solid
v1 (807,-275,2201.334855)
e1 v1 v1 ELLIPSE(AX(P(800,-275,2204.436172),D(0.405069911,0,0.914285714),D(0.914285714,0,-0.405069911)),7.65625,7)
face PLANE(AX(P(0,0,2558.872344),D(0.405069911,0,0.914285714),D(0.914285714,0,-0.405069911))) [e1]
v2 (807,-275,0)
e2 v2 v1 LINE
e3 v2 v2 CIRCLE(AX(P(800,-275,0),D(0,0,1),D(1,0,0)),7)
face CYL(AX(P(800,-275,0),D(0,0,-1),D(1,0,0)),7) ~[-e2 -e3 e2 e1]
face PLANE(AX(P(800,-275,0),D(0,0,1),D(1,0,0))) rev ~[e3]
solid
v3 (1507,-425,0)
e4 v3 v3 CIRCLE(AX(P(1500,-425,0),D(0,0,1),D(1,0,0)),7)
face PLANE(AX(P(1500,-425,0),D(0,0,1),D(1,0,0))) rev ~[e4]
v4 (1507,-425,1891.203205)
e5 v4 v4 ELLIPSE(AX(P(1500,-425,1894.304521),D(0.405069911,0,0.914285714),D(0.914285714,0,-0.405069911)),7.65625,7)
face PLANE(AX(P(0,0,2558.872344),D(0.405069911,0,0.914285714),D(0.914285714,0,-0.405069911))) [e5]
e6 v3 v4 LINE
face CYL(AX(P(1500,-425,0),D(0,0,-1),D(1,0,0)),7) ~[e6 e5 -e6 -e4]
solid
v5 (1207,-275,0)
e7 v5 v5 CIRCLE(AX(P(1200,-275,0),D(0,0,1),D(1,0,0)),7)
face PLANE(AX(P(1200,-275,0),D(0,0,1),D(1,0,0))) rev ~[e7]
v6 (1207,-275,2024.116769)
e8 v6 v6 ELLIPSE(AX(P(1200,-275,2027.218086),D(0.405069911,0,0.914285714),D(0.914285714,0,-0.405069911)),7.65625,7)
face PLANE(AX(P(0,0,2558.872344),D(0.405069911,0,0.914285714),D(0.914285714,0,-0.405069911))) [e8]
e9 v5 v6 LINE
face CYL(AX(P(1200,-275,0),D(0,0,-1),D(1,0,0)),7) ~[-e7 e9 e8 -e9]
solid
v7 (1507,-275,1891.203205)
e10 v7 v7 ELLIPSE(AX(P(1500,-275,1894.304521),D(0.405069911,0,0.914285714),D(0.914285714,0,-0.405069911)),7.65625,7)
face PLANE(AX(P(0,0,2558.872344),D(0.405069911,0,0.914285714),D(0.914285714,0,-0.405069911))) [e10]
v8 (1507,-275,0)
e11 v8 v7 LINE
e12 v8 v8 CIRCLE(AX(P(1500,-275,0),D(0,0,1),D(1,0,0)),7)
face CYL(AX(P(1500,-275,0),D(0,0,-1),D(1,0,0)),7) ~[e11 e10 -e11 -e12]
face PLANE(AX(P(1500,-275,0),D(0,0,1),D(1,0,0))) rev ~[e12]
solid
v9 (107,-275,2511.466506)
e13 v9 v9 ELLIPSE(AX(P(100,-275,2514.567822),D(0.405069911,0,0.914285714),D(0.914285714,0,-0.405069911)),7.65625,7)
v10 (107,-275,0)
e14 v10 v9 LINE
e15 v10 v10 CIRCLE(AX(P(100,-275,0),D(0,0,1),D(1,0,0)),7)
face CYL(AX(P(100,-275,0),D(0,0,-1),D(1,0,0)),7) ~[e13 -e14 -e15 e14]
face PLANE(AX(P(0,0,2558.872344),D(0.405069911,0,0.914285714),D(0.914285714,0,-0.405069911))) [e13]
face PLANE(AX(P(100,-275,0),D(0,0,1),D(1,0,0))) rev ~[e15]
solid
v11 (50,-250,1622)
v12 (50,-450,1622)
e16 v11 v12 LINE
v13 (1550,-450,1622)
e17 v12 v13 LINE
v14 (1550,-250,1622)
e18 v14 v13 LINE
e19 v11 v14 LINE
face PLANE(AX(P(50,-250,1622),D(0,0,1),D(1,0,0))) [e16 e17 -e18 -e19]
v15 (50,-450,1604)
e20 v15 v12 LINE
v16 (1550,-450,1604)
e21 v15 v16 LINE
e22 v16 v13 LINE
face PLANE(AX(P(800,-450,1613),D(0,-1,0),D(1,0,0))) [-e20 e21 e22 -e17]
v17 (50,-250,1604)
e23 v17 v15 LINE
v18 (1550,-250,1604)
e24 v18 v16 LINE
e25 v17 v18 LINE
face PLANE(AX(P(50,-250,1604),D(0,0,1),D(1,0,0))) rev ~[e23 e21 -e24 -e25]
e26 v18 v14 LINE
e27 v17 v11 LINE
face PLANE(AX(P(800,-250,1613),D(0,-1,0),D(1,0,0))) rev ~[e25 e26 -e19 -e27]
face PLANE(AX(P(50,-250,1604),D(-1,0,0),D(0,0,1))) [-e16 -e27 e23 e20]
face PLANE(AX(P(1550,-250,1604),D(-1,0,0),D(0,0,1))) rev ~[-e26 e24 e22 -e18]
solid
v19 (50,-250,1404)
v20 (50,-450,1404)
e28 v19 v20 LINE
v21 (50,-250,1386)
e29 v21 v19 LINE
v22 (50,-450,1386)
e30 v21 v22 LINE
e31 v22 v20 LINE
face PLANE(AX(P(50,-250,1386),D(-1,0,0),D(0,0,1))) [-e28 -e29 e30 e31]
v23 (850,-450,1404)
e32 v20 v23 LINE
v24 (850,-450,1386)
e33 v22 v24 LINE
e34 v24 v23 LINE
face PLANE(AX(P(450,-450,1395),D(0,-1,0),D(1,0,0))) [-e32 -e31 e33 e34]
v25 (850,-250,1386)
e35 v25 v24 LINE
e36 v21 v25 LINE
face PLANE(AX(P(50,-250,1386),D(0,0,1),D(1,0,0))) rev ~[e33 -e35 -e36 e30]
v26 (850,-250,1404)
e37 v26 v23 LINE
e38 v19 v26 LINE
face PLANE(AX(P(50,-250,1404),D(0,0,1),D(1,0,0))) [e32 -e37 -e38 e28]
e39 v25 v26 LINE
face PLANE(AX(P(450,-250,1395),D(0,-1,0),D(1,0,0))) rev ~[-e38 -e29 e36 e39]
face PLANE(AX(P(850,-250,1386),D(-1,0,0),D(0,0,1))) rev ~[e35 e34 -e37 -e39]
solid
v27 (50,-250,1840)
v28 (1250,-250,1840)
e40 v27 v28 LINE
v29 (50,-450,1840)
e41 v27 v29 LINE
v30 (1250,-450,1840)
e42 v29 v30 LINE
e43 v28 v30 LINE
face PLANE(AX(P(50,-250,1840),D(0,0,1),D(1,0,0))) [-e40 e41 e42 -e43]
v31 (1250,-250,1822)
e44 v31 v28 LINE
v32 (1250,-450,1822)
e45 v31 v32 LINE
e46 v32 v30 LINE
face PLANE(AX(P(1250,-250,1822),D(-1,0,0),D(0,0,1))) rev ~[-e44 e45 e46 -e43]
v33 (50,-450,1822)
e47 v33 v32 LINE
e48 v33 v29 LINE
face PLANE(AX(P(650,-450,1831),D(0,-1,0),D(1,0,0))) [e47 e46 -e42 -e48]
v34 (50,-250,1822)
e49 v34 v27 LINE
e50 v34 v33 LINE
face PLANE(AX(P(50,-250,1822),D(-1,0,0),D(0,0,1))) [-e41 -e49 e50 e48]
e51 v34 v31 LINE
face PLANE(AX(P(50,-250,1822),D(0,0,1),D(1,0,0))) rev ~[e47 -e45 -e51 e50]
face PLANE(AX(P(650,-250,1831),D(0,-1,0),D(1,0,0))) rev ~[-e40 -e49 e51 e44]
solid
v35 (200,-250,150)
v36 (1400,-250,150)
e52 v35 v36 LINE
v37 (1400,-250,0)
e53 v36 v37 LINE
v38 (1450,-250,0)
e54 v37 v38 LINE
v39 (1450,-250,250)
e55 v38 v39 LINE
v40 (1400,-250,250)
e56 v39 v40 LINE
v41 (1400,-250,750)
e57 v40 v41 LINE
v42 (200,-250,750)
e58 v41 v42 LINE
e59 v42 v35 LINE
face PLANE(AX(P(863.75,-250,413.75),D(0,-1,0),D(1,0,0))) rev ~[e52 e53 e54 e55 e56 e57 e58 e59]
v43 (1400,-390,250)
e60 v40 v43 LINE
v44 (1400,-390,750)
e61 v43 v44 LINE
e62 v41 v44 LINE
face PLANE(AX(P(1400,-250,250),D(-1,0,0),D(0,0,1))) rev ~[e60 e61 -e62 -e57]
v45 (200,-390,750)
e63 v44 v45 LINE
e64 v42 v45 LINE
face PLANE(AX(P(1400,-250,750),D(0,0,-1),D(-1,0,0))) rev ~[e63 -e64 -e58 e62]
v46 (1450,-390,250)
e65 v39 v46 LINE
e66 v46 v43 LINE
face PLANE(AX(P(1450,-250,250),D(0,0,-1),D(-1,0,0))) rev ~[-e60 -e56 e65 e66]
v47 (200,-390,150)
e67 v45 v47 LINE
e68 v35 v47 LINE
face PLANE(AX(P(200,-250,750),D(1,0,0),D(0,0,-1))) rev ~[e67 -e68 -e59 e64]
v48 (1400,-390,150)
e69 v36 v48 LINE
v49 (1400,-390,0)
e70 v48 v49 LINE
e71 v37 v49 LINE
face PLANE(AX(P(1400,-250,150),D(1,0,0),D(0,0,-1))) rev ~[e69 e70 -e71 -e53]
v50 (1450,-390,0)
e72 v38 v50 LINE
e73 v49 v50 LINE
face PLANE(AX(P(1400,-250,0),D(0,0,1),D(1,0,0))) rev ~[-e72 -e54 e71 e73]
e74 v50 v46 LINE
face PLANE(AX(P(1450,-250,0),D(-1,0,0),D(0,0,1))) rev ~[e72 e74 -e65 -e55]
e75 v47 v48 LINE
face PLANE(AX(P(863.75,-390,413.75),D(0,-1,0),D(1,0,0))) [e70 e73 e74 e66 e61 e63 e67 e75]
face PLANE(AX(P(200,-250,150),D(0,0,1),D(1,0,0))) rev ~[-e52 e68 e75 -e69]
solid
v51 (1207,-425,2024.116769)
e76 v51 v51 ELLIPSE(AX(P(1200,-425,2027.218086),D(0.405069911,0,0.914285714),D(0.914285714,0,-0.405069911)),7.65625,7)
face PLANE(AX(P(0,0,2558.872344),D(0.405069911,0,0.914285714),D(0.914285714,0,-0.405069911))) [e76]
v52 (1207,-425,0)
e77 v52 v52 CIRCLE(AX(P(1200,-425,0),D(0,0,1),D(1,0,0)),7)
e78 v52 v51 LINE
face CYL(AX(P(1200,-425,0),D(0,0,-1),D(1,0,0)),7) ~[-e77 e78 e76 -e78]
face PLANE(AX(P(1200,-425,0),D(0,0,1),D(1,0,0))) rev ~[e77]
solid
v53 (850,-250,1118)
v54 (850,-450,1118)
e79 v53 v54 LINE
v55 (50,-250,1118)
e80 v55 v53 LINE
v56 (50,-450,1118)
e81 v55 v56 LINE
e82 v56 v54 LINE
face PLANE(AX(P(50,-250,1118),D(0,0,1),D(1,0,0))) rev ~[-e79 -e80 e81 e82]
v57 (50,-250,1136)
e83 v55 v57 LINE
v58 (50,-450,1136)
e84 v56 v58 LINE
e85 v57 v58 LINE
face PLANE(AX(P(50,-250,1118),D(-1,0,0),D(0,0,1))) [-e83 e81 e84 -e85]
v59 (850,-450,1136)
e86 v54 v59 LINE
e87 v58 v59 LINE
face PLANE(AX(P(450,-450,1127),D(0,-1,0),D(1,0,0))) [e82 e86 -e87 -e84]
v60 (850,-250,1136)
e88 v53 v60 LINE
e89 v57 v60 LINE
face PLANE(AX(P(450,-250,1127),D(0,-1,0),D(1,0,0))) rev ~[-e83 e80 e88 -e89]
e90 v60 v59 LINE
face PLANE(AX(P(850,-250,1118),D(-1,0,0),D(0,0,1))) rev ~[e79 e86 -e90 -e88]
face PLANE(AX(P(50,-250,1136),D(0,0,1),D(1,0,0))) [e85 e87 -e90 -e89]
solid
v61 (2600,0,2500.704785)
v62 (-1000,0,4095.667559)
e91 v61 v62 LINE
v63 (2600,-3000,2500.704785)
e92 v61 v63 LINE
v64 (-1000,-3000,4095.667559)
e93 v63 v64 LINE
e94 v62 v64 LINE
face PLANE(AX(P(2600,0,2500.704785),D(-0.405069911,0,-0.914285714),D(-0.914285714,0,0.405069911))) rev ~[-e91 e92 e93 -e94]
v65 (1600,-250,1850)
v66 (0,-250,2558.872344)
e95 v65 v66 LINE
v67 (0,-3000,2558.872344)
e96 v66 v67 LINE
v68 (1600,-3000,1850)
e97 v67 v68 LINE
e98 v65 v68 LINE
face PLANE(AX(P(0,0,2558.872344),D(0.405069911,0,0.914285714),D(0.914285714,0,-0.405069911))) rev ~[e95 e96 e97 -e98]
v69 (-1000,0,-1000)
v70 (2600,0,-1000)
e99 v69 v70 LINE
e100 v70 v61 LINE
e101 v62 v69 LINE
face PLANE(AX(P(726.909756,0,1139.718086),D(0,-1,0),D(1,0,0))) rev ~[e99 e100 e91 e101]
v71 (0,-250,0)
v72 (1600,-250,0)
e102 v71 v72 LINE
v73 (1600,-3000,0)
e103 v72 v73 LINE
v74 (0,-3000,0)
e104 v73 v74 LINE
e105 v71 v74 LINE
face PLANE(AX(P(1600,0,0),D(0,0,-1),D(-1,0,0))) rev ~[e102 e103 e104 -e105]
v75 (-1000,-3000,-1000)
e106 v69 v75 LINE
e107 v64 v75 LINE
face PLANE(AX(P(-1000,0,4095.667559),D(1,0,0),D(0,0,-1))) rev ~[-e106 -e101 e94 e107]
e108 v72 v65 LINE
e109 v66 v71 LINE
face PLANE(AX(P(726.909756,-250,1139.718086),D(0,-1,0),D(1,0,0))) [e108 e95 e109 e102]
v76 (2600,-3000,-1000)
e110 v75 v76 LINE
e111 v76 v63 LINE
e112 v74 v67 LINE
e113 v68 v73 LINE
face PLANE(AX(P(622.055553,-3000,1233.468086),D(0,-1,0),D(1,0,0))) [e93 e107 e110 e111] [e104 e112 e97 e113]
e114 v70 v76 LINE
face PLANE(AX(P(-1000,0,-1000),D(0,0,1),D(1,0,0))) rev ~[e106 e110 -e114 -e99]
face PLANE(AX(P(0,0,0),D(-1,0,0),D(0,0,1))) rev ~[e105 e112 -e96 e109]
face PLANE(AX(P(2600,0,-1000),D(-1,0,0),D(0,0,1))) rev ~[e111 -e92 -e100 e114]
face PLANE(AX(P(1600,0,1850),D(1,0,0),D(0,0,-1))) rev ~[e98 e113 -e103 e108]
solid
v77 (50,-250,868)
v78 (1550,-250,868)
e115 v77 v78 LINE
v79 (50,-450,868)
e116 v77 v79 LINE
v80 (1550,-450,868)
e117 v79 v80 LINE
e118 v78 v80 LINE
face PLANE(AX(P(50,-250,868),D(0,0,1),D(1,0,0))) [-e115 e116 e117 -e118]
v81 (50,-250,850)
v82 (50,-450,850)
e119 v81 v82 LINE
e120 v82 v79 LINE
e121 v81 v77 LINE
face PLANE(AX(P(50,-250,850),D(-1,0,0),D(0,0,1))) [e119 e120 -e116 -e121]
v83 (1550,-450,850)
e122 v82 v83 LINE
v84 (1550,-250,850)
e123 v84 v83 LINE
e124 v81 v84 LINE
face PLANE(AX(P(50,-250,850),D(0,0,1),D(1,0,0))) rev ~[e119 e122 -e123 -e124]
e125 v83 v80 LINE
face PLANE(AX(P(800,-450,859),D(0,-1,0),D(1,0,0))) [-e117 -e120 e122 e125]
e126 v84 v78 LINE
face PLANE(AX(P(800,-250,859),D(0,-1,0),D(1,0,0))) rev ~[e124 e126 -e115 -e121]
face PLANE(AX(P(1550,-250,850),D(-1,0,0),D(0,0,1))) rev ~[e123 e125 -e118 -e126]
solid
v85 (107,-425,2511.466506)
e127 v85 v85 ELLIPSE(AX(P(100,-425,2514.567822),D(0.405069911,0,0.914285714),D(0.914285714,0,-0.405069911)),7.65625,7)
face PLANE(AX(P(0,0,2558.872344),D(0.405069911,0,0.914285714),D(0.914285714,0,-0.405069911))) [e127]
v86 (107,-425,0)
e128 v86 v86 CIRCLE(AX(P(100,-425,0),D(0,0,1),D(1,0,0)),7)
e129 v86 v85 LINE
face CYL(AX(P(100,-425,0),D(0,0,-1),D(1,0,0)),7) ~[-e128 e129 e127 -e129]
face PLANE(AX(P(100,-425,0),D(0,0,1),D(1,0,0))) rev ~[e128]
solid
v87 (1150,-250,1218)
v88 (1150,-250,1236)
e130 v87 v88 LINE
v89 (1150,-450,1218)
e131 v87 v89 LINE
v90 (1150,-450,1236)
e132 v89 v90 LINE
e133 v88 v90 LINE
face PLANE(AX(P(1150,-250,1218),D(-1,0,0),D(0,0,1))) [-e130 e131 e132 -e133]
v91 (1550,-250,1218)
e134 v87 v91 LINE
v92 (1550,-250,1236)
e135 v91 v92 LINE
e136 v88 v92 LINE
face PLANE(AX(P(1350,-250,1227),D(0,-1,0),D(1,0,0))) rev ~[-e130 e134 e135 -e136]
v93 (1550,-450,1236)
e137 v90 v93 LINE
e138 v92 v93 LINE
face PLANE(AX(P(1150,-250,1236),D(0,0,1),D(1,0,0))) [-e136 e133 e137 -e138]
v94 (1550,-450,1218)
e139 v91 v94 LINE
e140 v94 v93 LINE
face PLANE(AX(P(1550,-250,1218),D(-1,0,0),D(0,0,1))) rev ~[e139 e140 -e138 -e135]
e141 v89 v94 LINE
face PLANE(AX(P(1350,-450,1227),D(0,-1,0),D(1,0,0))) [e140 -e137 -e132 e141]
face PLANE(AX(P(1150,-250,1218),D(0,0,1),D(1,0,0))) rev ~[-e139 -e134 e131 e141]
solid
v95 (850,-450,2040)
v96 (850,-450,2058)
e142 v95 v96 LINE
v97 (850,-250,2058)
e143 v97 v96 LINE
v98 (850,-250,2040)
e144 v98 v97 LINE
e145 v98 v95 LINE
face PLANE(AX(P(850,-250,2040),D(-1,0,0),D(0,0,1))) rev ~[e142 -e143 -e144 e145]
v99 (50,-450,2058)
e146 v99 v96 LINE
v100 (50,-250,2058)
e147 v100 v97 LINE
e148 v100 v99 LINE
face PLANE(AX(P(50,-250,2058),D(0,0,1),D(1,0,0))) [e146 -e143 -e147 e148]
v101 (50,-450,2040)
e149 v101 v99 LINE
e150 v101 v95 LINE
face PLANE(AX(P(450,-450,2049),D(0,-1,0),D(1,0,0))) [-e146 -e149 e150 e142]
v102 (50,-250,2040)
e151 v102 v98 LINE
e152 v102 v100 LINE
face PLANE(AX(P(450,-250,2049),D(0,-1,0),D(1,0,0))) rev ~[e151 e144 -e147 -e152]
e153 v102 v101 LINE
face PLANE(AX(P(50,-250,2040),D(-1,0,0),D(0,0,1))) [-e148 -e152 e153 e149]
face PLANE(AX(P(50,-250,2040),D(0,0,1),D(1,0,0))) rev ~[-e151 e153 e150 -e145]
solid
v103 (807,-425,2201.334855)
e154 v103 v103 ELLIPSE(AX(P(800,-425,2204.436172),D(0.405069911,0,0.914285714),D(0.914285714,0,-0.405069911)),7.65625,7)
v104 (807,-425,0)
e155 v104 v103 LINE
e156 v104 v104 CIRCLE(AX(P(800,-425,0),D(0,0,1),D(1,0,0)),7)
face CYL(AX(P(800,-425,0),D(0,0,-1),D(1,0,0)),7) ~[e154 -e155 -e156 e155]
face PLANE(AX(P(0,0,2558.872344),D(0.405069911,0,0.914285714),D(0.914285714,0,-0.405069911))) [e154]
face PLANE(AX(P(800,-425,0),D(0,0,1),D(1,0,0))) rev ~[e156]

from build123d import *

# Parameters (mm, degrees)
F1_DEPTH = 3000
F2_DEPTH = 250
F4_DEPTH = 140
F5_W     = 1500
F5_H     = 18
F6_DEPTH = 200
F5_W_2   = 400
F5_W_3   = 800
F5_W_4   = 1200
F7_R     = 7
F8_REACH = 4115.4675487723


with BuildPart() as f1:
    # F0 (on Front) → F1 (new body)
    with BuildSketch(Plane.XZ):
        Polygon((2600, -1000), (2600, 2500.7047850388), (-1000, 4095.6675588991), (-1000, -1000), align=None)
        Polygon((1600, 0), (0, 0), (0, 2558.8723439379), (1600, 1850), align=None, mode=Mode.SUBTRACT)
    extrude(amount=F1_DEPTH)

    # F0 (on Front) → F2 (join)
    with BuildSketch(Plane.XZ):
        Polygon((0, 2558.8723439379), (0, 0), (1600, 0), (1600, 1850), align=None)
    extrude(amount=F2_DEPTH)


with BuildPart() as f4:
    # F3 (on face) → F4 (new body)
    with BuildSketch(Plane.XZ.offset(250)):
        Polygon((1400, 750), (200, 750), (200, 150), (1400, 150), (1400, 0), (1450, 0), (1450, 250), (1400, 250), align=None)
    extrude(amount=F4_DEPTH)


with BuildPart() as f6:
    # F5 (on face) → F6 (new body)
    with BuildSketch(Plane.XZ.offset(250)):
        with Locations((800, 859)):
            Rectangle(F5_W, F5_H)
    extrude(amount=F6_DEPTH)


with BuildPart() as f6b:
    # F5 (on face) → F6, piece 2 (new body)
    with BuildSketch(Plane.XZ.offset(250)):
        with Locations((1350, 1227)):
            Rectangle(F5_W_2, F5_H)
    extrude(amount=F6_DEPTH)


with BuildPart() as f6c:
    # F5 (on face) → F6, piece 3 (new body)
    with BuildSketch(Plane.XZ.offset(250)):
        with Locations((450, 1127)):
            Rectangle(F5_W_3, F5_H)
    extrude(amount=F6_DEPTH)


with BuildPart() as f6d:
    # F5 (on face) → F6, piece 4 (new body)
    with BuildSketch(Plane.XZ.offset(250)):
        with Locations((450, 1395)):
            Rectangle(F5_W_3, F5_H)
    extrude(amount=F6_DEPTH)


with BuildPart() as f6e:
    # F5 (on face) → F6, piece 5 (new body)
    with BuildSketch(Plane.XZ.offset(250)):
        with Locations((800, 1613)):
            Rectangle(F5_W, F5_H)
    extrude(amount=F6_DEPTH)


with BuildPart() as f6f:
    # F5 (on face) → F6, piece 6 (new body)
    with BuildSketch(Plane.XZ.offset(250)):
        with Locations((450, 2049)):
            Rectangle(F5_W_3, F5_H)
    extrude(amount=F6_DEPTH)


with BuildPart() as f6g:
    # F5 (on face) → F6, piece 7 (new body)
    with BuildSketch(Plane.XZ.offset(250)):
        with Locations((650, 1831)):
            Rectangle(F5_W_4, F5_H)
    extrude(amount=F6_DEPTH)


with BuildPart() as f8:
    f8_end = f1.part.faces().sort_by_distance((800, -1625, 2204.4361719689))[0]
    # F7 (on face) → F8 (new body, up to a face of F1 that its end follows)
    with BuildSketch(Plane.XY):
        with Locations((100, -275)):
            Circle(F7_R)
    f8_long = extrude(amount=F8_REACH, mode=Mode.PRIVATE)
    add(split(f8_long, bisect_by=f8_end, keep=Keep.TOP, mode=Mode.PRIVATE))


with BuildPart() as f8b:
    f8_2_end = f1.part.faces().sort_by_distance((800, -1625, 2204.4361719689))[0]
    # F7 (on face) → F8, piece 2 (new body, up to a face of F1 that its end follows)
    with BuildSketch(Plane.XY):
        with Locations((100, -425)):
            Circle(F7_R)
    f8_2_long = extrude(amount=F8_REACH, mode=Mode.PRIVATE)
    add(split(f8_2_long, bisect_by=f8_2_end, keep=Keep.TOP, mode=Mode.PRIVATE))


with BuildPart() as f8c:
    f8_3_end = f1.part.faces().sort_by_distance((800, -1625, 2204.4361719689))[0]
    # F7 (on face) → F8, piece 3 (new body, up to a face of F1 that its end follows)
    with BuildSketch(Plane.XY):
        with Locations((1500, -425)):
            Circle(F7_R)
    f8_3_long = extrude(amount=F8_REACH, mode=Mode.PRIVATE)
    add(split(f8_3_long, bisect_by=f8_3_end, keep=Keep.TOP, mode=Mode.PRIVATE))


with BuildPart() as f8d:
    f8_4_end = f1.part.faces().sort_by_distance((800, -1625, 2204.4361719689))[0]
    # F7 (on face) → F8, piece 4 (new body, up to a face of F1 that its end follows)
    with BuildSketch(Plane.XY):
        with Locations((1500, -275)):
            Circle(F7_R)
    f8_4_long = extrude(amount=F8_REACH, mode=Mode.PRIVATE)
    add(split(f8_4_long, bisect_by=f8_4_end, keep=Keep.TOP, mode=Mode.PRIVATE))


with BuildPart() as f8e:
    f8_5_end = f1.part.faces().sort_by_distance((800, -1625, 2204.4361719689))[0]
    # F7 (on face) → F8, piece 5 (new body, up to a face of F1 that its end follows)
    with BuildSketch(Plane.XY):
        with Locations((800, -275)):
            Circle(F7_R)
    f8_5_long = extrude(amount=F8_REACH, mode=Mode.PRIVATE)
    add(split(f8_5_long, bisect_by=f8_5_end, keep=Keep.TOP, mode=Mode.PRIVATE))


with BuildPart() as f8f:
    f8_6_end = f1.part.faces().sort_by_distance((800, -1625, 2204.4361719689))[0]
    # F7 (on face) → F8, piece 6 (new body, up to a face of F1 that its end follows)
    with BuildSketch(Plane.XY):
        with Locations((800, -425)):
            Circle(F7_R)
    f8_6_long = extrude(amount=F8_REACH, mode=Mode.PRIVATE)
    add(split(f8_6_long, bisect_by=f8_6_end, keep=Keep.TOP, mode=Mode.PRIVATE))


with BuildPart() as f8g:
    f8_7_end = f1.part.faces().sort_by_distance((800, -1625, 2204.4361719689))[0]
    # F7 (on face) → F8, piece 7 (new body, up to a face of F1 that its end follows)
    with BuildSketch(Plane.XY):
        with Locations((1200, -275)):
            Circle(F7_R)
    f8_7_long = extrude(amount=F8_REACH, mode=Mode.PRIVATE)
    add(split(f8_7_long, bisect_by=f8_7_end, keep=Keep.TOP, mode=Mode.PRIVATE))


with BuildPart() as f8h:
    f8_8_end = f1.part.faces().sort_by_distance((800, -1625, 2204.4361719689))[0]
    # F7 (on face) → F8, piece 8 (new body, up to a face of F1 that its end follows)
    with BuildSketch(Plane.XY):
        with Locations((1200, -425)):
            Circle(F7_R)
    f8_8_long = extrude(amount=F8_REACH, mode=Mode.PRIVATE)
    add(split(f8_8_long, bisect_by=f8_8_end, keep=Keep.TOP, mode=Mode.PRIVATE))


solid = Compound([f1.part, f4.part, f6.part, f6b.part, f6c.part, f6d.part, f6e.part, f6f.part, f6g.part, f8.part, f8b.part, f8c.part, f8d.part, f8e.part, f8f.part, f8g.part, f8h.part])
